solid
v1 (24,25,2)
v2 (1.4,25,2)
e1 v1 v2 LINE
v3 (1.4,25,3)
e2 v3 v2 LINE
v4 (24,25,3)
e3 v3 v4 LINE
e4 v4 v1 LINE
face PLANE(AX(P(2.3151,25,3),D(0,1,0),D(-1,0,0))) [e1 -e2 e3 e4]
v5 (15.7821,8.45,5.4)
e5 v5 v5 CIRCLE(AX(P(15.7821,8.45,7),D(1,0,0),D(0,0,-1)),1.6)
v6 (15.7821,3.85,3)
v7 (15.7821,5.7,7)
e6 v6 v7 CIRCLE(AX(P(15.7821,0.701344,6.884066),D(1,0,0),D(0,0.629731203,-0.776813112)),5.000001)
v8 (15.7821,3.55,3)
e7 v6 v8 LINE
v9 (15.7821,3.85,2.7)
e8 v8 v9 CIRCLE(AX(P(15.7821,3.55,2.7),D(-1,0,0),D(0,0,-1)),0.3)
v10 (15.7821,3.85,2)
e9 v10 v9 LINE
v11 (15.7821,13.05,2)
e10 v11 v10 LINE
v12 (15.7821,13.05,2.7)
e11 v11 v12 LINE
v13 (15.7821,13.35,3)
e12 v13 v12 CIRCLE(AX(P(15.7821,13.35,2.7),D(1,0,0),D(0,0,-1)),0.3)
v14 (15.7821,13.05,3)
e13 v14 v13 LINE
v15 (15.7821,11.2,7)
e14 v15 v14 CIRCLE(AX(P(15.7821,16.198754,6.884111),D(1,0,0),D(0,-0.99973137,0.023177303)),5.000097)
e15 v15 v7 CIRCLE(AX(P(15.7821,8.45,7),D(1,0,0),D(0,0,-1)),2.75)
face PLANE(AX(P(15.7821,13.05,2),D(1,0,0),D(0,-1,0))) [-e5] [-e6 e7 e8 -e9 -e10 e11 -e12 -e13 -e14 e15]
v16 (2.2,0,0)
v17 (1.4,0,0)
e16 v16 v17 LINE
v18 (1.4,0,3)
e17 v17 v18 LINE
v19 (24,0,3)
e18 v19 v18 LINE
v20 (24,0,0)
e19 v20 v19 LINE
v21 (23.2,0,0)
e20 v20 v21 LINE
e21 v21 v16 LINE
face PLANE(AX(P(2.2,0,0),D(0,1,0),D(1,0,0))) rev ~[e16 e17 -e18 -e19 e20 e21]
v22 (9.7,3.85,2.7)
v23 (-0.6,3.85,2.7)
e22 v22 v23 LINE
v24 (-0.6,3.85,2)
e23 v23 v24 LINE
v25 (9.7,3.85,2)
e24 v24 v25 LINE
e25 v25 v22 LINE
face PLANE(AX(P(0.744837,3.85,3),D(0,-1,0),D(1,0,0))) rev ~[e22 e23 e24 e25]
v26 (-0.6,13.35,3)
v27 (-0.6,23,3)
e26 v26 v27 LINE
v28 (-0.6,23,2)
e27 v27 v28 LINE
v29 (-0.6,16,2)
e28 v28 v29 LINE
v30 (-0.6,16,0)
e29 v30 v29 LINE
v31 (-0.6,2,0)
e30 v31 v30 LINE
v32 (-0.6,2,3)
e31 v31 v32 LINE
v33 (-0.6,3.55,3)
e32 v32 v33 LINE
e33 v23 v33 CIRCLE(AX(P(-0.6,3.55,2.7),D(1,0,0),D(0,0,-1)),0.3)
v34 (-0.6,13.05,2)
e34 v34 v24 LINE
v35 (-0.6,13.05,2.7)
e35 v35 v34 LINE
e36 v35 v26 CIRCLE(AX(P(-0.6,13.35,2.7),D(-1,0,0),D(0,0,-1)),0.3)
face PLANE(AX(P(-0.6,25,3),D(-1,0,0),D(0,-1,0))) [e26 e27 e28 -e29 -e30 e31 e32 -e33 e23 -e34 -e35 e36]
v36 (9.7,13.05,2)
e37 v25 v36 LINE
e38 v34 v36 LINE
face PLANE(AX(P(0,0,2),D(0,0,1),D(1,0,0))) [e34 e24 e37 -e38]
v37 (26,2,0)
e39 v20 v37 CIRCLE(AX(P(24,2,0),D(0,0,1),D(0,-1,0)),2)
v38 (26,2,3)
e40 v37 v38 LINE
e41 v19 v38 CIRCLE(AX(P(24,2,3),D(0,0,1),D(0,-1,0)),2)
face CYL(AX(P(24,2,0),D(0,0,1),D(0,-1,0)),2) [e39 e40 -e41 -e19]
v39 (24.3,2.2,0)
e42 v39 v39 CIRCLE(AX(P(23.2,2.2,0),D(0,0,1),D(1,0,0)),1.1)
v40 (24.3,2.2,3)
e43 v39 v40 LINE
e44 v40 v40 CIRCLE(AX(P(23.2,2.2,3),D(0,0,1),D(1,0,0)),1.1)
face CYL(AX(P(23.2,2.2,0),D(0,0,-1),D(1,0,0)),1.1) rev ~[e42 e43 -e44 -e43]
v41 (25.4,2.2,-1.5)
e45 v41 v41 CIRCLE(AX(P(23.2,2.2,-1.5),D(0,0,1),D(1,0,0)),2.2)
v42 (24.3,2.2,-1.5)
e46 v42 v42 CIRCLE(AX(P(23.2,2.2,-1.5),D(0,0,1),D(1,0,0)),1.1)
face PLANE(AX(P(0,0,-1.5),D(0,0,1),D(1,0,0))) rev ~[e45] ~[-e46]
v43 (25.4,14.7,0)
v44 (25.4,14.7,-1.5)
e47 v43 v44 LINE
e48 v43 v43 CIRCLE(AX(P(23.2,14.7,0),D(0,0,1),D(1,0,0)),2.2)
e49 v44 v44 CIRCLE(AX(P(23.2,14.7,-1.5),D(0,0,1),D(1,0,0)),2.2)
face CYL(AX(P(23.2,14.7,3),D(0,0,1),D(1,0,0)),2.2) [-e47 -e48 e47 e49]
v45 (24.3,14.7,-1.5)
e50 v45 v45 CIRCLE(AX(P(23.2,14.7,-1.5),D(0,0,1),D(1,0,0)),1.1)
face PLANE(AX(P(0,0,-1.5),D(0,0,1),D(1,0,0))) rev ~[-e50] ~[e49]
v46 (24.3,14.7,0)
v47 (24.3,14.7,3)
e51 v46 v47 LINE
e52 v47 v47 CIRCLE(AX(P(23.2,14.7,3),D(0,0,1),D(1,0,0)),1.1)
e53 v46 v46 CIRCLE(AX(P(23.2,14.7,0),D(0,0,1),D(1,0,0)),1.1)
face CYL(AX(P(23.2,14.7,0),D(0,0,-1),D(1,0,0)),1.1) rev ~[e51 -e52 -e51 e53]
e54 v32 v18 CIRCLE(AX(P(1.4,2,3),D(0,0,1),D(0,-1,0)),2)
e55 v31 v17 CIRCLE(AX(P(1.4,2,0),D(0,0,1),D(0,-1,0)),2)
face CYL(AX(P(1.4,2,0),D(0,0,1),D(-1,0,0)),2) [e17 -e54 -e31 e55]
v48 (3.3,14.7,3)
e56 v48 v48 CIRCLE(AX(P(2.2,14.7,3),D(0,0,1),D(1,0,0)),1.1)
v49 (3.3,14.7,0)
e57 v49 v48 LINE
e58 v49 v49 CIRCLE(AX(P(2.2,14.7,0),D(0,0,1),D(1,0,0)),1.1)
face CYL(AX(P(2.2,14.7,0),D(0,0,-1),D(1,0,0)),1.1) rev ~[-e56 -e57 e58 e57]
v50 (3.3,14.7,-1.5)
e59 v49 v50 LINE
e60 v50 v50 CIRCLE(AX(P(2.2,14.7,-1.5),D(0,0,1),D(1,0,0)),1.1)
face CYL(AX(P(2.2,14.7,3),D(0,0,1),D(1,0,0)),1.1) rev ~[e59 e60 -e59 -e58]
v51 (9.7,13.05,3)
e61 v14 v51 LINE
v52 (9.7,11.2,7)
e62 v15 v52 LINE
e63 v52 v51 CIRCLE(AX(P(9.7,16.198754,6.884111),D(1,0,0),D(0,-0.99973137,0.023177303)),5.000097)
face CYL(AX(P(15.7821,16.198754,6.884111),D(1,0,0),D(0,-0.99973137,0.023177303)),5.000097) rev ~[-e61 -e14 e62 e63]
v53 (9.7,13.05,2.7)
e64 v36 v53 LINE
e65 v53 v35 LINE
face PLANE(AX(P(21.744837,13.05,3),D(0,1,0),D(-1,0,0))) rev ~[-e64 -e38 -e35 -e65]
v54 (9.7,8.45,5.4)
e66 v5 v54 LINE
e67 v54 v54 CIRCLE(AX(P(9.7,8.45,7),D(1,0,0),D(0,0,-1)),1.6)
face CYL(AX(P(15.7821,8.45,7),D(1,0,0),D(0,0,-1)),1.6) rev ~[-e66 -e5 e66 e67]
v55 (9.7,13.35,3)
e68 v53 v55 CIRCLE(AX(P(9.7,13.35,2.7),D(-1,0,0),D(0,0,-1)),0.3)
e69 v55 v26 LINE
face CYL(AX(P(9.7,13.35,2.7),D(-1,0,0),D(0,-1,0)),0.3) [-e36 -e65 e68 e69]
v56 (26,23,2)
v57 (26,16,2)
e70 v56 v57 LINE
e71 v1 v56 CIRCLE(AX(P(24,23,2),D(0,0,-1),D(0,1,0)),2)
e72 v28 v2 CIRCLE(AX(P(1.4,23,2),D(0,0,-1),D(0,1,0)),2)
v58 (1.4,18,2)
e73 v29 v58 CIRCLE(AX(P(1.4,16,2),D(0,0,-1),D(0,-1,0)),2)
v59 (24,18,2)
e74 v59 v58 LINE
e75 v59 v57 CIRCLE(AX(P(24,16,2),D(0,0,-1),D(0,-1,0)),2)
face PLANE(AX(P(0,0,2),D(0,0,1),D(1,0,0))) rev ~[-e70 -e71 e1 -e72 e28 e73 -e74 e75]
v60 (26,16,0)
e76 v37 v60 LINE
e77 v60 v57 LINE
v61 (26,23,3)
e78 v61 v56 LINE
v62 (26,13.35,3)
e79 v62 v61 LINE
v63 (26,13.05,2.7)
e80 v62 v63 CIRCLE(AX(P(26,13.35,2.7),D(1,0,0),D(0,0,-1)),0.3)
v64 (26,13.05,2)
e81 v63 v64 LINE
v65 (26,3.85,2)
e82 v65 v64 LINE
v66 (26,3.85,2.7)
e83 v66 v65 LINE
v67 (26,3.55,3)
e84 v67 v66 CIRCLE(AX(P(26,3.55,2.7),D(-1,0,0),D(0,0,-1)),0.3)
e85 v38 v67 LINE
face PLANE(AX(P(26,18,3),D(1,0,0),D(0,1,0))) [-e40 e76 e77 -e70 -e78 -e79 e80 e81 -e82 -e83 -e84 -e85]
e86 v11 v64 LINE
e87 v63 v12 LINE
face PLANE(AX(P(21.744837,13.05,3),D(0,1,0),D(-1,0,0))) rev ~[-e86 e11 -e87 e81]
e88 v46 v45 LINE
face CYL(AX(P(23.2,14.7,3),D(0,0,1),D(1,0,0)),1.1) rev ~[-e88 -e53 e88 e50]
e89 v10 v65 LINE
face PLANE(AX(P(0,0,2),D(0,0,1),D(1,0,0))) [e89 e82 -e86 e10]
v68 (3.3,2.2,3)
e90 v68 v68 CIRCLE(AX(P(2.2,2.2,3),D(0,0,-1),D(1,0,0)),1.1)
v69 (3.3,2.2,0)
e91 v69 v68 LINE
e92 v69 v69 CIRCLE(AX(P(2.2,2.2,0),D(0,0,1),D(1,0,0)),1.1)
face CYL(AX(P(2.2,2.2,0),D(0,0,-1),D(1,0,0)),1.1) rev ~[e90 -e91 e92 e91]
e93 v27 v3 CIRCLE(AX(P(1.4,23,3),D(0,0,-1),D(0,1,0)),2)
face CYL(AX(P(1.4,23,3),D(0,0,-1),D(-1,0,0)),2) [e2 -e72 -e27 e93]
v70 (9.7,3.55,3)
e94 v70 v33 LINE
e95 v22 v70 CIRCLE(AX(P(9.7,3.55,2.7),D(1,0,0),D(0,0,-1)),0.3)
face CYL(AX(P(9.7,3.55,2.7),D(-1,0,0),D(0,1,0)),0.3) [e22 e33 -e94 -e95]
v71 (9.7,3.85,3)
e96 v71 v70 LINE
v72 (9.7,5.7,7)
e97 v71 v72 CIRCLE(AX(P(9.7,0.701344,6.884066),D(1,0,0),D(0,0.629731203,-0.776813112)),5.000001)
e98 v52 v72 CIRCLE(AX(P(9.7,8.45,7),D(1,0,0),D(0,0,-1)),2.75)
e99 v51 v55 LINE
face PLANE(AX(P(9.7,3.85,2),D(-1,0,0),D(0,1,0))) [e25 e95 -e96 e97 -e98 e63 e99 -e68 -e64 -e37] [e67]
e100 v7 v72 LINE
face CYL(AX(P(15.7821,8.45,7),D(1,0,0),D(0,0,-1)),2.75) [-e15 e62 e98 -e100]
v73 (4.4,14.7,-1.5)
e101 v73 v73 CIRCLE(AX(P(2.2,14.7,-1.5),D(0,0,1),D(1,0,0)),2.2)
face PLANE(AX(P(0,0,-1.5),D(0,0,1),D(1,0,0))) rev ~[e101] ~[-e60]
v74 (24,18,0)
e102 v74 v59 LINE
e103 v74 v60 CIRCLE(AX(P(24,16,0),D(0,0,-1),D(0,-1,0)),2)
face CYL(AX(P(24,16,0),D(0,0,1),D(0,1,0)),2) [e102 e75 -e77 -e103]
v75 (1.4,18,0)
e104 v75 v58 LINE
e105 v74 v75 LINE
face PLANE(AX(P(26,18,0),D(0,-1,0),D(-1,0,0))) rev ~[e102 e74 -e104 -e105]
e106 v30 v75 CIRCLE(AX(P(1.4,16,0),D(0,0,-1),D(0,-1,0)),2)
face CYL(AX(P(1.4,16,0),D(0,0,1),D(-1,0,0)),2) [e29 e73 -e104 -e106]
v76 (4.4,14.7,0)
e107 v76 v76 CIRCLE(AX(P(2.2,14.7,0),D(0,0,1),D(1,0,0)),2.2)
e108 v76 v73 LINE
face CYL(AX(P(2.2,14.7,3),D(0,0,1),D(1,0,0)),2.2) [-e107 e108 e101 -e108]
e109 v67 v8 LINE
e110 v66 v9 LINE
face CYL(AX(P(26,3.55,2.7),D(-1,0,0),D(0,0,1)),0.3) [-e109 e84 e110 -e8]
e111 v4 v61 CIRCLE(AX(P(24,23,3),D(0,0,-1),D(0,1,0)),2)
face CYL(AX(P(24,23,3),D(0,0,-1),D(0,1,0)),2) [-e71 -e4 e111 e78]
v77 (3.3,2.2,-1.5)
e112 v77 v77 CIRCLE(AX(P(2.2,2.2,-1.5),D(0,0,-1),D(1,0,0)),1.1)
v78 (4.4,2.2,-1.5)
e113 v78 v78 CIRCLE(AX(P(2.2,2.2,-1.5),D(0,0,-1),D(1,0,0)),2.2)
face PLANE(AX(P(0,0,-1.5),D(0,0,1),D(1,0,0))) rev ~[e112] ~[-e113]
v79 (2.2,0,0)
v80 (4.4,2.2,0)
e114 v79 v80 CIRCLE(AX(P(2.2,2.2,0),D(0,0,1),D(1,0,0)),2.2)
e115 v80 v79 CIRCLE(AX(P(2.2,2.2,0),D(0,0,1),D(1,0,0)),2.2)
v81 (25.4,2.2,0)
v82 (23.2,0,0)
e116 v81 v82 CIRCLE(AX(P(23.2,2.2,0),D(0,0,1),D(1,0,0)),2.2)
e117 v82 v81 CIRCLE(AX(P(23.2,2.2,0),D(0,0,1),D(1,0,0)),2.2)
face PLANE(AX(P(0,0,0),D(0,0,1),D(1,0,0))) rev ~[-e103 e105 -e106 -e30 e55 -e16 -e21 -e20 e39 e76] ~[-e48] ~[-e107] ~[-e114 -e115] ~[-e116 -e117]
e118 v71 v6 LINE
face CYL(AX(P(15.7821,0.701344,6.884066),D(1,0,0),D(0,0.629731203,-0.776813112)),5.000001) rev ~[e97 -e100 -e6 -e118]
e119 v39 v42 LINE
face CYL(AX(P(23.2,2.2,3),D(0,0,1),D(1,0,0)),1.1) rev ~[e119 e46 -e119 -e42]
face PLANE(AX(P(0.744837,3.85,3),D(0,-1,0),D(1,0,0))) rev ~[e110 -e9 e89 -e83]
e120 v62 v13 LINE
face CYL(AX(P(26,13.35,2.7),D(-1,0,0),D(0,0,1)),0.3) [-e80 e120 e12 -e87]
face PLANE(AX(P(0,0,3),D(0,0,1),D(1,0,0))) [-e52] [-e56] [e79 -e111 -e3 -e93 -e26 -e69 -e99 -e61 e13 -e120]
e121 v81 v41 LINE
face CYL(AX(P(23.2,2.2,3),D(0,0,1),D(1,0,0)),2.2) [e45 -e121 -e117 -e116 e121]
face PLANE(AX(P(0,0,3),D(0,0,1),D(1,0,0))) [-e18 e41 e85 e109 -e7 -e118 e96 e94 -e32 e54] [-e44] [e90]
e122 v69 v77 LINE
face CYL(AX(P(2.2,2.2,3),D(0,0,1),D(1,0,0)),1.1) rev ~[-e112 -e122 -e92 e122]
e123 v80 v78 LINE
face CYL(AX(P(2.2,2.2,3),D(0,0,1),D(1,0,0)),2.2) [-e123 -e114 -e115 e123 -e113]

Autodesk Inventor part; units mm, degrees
ref_plane "YZ Plane" through (0, 0, 0) normal (1, 0, 0) x (0, 1, 0)
ref_plane "XZ Plane" through (0, 0, 0) normal (0, 1, 0) x (-1, 0, 0)
ref_plane "XY Plane" through (0, 0, 0) normal (0, 0, 1) x (1, 0, 0)
sketch "Sketch3" plane through (0, 0, 0) normal (0, 0, 1) x (1, 0, 0)
  line L0 (26, 0) -> (26, 25)
  line L1 (26, 25) -> (2.3151, 25)
  circle A0 centre (2.2, 2.2) radius 2.2
  circle A1 centre (2.2, 2.2) radius 1.1
  circle A2 centre (2.2, 14.7) radius 1.1
  circle A3 centre (2.2, 14.7) radius 2.2
  circle A4 centre (23.2, 2.2) radius 2.2
  circle A5 centre (23.2, 2.2) radius 1.1
  circle A6 centre (23.2, 14.7) radius 1.1
  circle A7 centre (23.2, 14.7) radius 2.2
  line L2 (2.2, 2.2) -> (-0.6, 2.2)
  line L3 (-0.6, 2.2) -> (-0.6, 0)
  line L4 (-0.6, 0) -> (2.2, 0)
  line L5 (2.2, 0) -> (2.2, 2.2)
  line L6 (-0.6, 0) -> (26, 0)
  line L7 (26, 0) -> (26, 25)
  line L8 (26, 25) -> (-0.6, 25)
  line L9 (-0.6, 25) -> (-0.6, 0)
  line L10 (-0.6, 25) -> (26, 25)
  line L11 (26, 25) -> (26, 18)
  line L12 (26, 18) -> (-0.6, 18)
  line L13 (-0.6, 18) -> (-0.6, 25)
  point P0 (0, 0)
  point P1 (-0.6, 18)
  dimension "d14" = 25
  dimension "d15" = 4.4
  dimension "d16" = 2.2
  dimension "d18" = 2.2
  dimension "d19" = 4.4
  dimension "d21" = 4.4
  dimension "d22" = 2.2
  dimension "d23" = 4.4
  dimension "d25" = 7
extrude "Extrusion1" add sketch "Sketch3" along normal blind 3 contours A4 | L6 A0 L2 L9 L12 L0 | L5 A1 L2 A0 | L4 L3 L2 A0 | A0 L2 A1 L5 | A3 | A7
sketch "Sketch5" plane through (0, 0, 3) normal (0, 0, 1) x (1, 0, 0)
  line L0 (26, 0) -> (26, 25)
  line L1 (26, 25) -> (2.3151, 25)
  circle A0 centre (2.2, 2.2) radius 2.2
  circle A1 centre (2.2, 2.2) radius 1.1
  circle A2 centre (2.2, 14.7) radius 1.1
  circle A3 centre (2.2, 14.7) radius 2.2
  circle A4 centre (23.2, 2.2) radius 2.2
  circle A5 centre (23.2, 2.2) radius 1.1
  circle A6 centre (23.2, 14.7) radius 1.1
  circle A7 centre (23.2, 14.7) radius 2.2
  line L2 (2.2, 2.2) -> (-0.6, 2.2)
  line L3 (-0.6, 2.2) -> (-0.6, 0)
  line L4 (-0.6, 0) -> (2.2, 0)
  line L5 (2.2, 0) -> (2.2, 2.2)
  line L6 (-0.6, 0) -> (26, 0)
  line L7 (26, 0) -> (26, 25)
  line L8 (26, 25) -> (-0.6, 25)
  line L9 (-0.6, 25) -> (-0.6, 0)
  line L10 (-0.6, 25) -> (26, 25)
  line L11 (26, 25) -> (26, 18)
  line L12 (26, 18) -> (-0.6, 18)
  line L13 (-0.6, 18) -> (-0.6, 25)
  point P0 (0, 0)
  point P1 (0, 0)
  point P2 (-0.6, 18)
  point P3 (-0.6, 18)
  dimension "d28" = 25
  dimension "d29" = 4.4
  dimension "d30" = 2.2
  dimension "d31" = 2.2
  dimension "d32" = 4.4
  dimension "d33" = 4.4
  dimension "d34" = 2.2
  dimension "d35" = 4.4
  dimension "d36" = 7
extrude "Extrusion2" add sketch "Sketch5" against normal blind 1 contours L12 L9 L8 L1 L0
sketch "Sketch6" plane through (0, 0, 3) normal (0, 0, 1) x (1, 0, 0)
  line L0 (26, 0) -> (26, 25)
  line L1 (26, 25) -> (2.3151, 25)
  circle A0 centre (2.2, 2.2) radius 2.2
  circle A1 centre (2.2, 2.2) radius 1.1
  circle A2 centre (2.2, 14.7) radius 1.1
  circle A3 centre (2.2, 14.7) radius 2.2
  circle A4 centre (23.2, 2.2) radius 2.2
  circle A5 centre (23.2, 2.2) radius 1.1
  circle A6 centre (23.2, 14.7) radius 1.1
  circle A7 centre (23.2, 14.7) radius 2.2
  line L2 (2.2, 2.2) -> (-0.6, 2.2)
  line L3 (-0.6, 2.2) -> (-0.6, 0)
  line L4 (-0.6, 0) -> (2.2, 0)
  line L5 (2.2, 0) -> (2.2, 2.2)
  line L6 (-0.6, 0) -> (26, 0)
  line L7 (26, 0) -> (26, 25)
  line L8 (26, 25) -> (-0.6, 25)
  line L9 (-0.6, 25) -> (-0.6, 0)
  line L10 (-0.6, 25) -> (26, 25)
  line L11 (26, 25) -> (26, 18)
  line L12 (26, 18) -> (-0.6, 18)
  line L13 (-0.6, 18) -> (-0.6, 25)
  point P0 (0, 0)
  point P1 (0, 0)
  point P2 (-0.6, 18)
  dimension "d39" = 25
  dimension "d40" = 4.4
  dimension "d41" = 2.2
  dimension "d42" = 2.2
  dimension "d43" = 4.4
  dimension "d44" = 4.4
  dimension "d45" = 2.2
  dimension "d46" = 4.4
  dimension "d47" = 7
extrude "Extrusion3" add sketch "Sketch6" against normal blind 4.5 contours A4 | L5 A1 L2 A0 | A0 L2 A1 L5 | A3 | A7
fillet "Fillet1" radius 2 6 edges at (26, 25, 2.5) (-0.6, 25, 2.5) (26, 18, 1) (-0.6, 18, 1) (-0.6, 0, 1.5) (26, 0, 1.5)
thread "Thread1" size "M2.2x0.45" class "6H" standard "ANSI Metric M Profile" full length
thread "Thread2" size "M2.2x0.45" class "6H" standard "ANSI Metric M Profile" full length
thread "Thread3" size "M2.2x0.45" class "6H" standard "ANSI Metric M Profile" full length
thread "Thread4" size "M2.2x0.45" class "6H" standard "ANSI Metric M Profile" full length
sketch "Sketch7" plane through (0, 0, 3) normal (0, 0, 1) x (1, 0, 0)
  circle A0 centre (2.2, 2.2) radius 1.1 projected
  circle A1 centre (23.2, 14.7) radius 1.1 projected
  circle A2 centre (2.2, 2.2) radius 2.2 projected
  circle A3 centre (23.2, 14.7) radius 2.2 projected
  line L0 (-0.6, 3.85) -> (26, 3.85)
  line L1 (26, 3.85) -> (26, 13.05)
  line L2 (26, 13.05) -> (-0.6, 13.05)
  line L3 (-0.6, 13.05) -> (-0.6, 3.85)
  point P0 (0, 0)
  point P1 (23.2, 13.05)
  point P2 (2.2, 3.85)
extrude "Extrusion4" cut sketch "Sketch7" against normal blind 1 contours L0 A2 | A2 L0 L3 L2 A3 L1 | A3 L2 picked at (2.5398, 3.9498) picked at (23.5398, 12.9502)
sketch "Sketch8" plane through (0, 0, 2) normal (0, 0, 1) x (1, 0, 0)
  line L0 (-0.6, 3.85) -> (-0.6, 13.05) projected
  line L1 (-0.6, 13.05) -> (26, 13.05) projected
  line L2 (-0.6, 3.85) -> (26, 3.85)
  line L3 (26, 3.85) -> (26, 13.05)
  line L4 (26, 13.05) -> (-0.6, 13.05)
  line L5 (-0.6, 13.05) -> (-0.6, 3.85)
  line L6 (26, 3.85) -> (-0.6, 3.85) projected
  line L7 (12.7, 3.85) -> (14.9828, 3.85)
  line L8 (14.9828, 3.85) -> (12.7, 3.85)
  line L9 (15.7821, 13.05) -> (15.7821, 3.85)
  line L10 (9.7, 3.85) -> (9.7, 13.05)
  point P0 (0, 0)
  point P1 (15.7821, 3.85)
extrude "Extrusion5" add sketch "Sketch8" along normal blind 10 contours L10 L1 L9 L2
fillet "Fillet2" radius 0.3 4 edges at (4.55, 13.05, 3) (4.55, 3.85, 3) (20.8911, 13.05, 3) (20.8911, 3.85, 3)
sketch "Sketch9" plane through (15.7821, 3.85, 2) normal (1, 0, 0) x (0, 0, -1)
  line L0 (0, 0) -> (0, 4.6)
  line L1 (-10, 0) -> (-10, 9.2) projected
  circle A0 centre (-5, 4.6) radius 1.6
  circle A1 centre (-5, 4.6) radius 2.75
  line L2 (-1, 0) -> (-5, 1.85)
  line L3 (-1, 9.2) -> (-10, 9.2) projected
  line L4 (-1, 9.2) -> (-5, 7.35)
  line L5 (0, 0) -> (-0.7, 0) projected
  line L6 (-10, 0) -> (0, 0)
  line L7 (0, 0) -> (0, 9.2)
  line L8 (0, 9.2) -> (-1, 9.2)
  line L9 (-0.7, 9.2) -> (0, 9.2) projected
  line L10 (-1, 0) -> (-1, -0.3) projected
  arc A2 (-1, 0) -> (-5, 1.85) centre (-4.8841, -3.1487) ccw
  arc A3 (-5, 7.35) -> (-1, 9.2) centre (-4.8841, 12.3487) ccw
  point P0 (2, -3.85)
  point P1 (-4.9177, 7.3488)
  point P2 (-4.9177, 1.8512)
  dimension "d69" = 3.2
  dimension "d70" = 5.5
  dimension "d73" = 5
  dimension "d74" = 5
extrude "Extrusion6" cut sketch "Sketch9" against normal blind 10 contours L6 L1 L3 L4 A1 L2 | L2 A2 | A3 L4
sketch "Sketch10" plane through (15.7821, 3.85, 2) normal (1, 0, 0) x (0, 0, -1)
  line L0 (0, 0) -> (0, 4.6)
  line L1 (-10, 0) -> (-10, 9.2)
  circle A0 centre (-5, 4.6) radius 1.6
  circle A1 centre (-5, 4.6) radius 2.75
  line L2 (-1, 0) -> (-5, 1.85)
  line L3 (-1, 9.2) -> (-10, 9.2)
  line L4 (-1, 9.2) -> (-5, 7.35)
  line L5 (0, 0) -> (-0.7, 0)
  line L6 (-10, 0) -> (0, 0)
  line L7 (0, 0) -> (0, 9.2)
  line L8 (0, 9.2) -> (-1, 9.2)
  line L9 (-0.7, 9.2) -> (0, 9.2)
  line L10 (-1, 0) -> (-1, -0.3)
  arc A2 (-1, 0) -> (-5, 1.85) centre (-4.8841, -3.1487) ccw
  arc A3 (-5, 7.35) -> (-1, 9.2) centre (-4.8841, 12.3487) ccw
  point P0 (2, -3.85)
  point P1 (2, -3.85)
  point P2 (-4.9177, 7.3488)
  point P3 (-4.9177, 1.8512)
  dimension "d75" = 3.2
  dimension "d76" = 5.5
  dimension "d77" = 5
  dimension "d78" = 5
extrude "Extrusion7" cut sketch "Sketch10" against normal blind 10 contours A0
thread "Thread5" size "M3.5x0.6" class "6H" standard "ANSI Metric M Profile" full length
properties part number "supCamnovo"
